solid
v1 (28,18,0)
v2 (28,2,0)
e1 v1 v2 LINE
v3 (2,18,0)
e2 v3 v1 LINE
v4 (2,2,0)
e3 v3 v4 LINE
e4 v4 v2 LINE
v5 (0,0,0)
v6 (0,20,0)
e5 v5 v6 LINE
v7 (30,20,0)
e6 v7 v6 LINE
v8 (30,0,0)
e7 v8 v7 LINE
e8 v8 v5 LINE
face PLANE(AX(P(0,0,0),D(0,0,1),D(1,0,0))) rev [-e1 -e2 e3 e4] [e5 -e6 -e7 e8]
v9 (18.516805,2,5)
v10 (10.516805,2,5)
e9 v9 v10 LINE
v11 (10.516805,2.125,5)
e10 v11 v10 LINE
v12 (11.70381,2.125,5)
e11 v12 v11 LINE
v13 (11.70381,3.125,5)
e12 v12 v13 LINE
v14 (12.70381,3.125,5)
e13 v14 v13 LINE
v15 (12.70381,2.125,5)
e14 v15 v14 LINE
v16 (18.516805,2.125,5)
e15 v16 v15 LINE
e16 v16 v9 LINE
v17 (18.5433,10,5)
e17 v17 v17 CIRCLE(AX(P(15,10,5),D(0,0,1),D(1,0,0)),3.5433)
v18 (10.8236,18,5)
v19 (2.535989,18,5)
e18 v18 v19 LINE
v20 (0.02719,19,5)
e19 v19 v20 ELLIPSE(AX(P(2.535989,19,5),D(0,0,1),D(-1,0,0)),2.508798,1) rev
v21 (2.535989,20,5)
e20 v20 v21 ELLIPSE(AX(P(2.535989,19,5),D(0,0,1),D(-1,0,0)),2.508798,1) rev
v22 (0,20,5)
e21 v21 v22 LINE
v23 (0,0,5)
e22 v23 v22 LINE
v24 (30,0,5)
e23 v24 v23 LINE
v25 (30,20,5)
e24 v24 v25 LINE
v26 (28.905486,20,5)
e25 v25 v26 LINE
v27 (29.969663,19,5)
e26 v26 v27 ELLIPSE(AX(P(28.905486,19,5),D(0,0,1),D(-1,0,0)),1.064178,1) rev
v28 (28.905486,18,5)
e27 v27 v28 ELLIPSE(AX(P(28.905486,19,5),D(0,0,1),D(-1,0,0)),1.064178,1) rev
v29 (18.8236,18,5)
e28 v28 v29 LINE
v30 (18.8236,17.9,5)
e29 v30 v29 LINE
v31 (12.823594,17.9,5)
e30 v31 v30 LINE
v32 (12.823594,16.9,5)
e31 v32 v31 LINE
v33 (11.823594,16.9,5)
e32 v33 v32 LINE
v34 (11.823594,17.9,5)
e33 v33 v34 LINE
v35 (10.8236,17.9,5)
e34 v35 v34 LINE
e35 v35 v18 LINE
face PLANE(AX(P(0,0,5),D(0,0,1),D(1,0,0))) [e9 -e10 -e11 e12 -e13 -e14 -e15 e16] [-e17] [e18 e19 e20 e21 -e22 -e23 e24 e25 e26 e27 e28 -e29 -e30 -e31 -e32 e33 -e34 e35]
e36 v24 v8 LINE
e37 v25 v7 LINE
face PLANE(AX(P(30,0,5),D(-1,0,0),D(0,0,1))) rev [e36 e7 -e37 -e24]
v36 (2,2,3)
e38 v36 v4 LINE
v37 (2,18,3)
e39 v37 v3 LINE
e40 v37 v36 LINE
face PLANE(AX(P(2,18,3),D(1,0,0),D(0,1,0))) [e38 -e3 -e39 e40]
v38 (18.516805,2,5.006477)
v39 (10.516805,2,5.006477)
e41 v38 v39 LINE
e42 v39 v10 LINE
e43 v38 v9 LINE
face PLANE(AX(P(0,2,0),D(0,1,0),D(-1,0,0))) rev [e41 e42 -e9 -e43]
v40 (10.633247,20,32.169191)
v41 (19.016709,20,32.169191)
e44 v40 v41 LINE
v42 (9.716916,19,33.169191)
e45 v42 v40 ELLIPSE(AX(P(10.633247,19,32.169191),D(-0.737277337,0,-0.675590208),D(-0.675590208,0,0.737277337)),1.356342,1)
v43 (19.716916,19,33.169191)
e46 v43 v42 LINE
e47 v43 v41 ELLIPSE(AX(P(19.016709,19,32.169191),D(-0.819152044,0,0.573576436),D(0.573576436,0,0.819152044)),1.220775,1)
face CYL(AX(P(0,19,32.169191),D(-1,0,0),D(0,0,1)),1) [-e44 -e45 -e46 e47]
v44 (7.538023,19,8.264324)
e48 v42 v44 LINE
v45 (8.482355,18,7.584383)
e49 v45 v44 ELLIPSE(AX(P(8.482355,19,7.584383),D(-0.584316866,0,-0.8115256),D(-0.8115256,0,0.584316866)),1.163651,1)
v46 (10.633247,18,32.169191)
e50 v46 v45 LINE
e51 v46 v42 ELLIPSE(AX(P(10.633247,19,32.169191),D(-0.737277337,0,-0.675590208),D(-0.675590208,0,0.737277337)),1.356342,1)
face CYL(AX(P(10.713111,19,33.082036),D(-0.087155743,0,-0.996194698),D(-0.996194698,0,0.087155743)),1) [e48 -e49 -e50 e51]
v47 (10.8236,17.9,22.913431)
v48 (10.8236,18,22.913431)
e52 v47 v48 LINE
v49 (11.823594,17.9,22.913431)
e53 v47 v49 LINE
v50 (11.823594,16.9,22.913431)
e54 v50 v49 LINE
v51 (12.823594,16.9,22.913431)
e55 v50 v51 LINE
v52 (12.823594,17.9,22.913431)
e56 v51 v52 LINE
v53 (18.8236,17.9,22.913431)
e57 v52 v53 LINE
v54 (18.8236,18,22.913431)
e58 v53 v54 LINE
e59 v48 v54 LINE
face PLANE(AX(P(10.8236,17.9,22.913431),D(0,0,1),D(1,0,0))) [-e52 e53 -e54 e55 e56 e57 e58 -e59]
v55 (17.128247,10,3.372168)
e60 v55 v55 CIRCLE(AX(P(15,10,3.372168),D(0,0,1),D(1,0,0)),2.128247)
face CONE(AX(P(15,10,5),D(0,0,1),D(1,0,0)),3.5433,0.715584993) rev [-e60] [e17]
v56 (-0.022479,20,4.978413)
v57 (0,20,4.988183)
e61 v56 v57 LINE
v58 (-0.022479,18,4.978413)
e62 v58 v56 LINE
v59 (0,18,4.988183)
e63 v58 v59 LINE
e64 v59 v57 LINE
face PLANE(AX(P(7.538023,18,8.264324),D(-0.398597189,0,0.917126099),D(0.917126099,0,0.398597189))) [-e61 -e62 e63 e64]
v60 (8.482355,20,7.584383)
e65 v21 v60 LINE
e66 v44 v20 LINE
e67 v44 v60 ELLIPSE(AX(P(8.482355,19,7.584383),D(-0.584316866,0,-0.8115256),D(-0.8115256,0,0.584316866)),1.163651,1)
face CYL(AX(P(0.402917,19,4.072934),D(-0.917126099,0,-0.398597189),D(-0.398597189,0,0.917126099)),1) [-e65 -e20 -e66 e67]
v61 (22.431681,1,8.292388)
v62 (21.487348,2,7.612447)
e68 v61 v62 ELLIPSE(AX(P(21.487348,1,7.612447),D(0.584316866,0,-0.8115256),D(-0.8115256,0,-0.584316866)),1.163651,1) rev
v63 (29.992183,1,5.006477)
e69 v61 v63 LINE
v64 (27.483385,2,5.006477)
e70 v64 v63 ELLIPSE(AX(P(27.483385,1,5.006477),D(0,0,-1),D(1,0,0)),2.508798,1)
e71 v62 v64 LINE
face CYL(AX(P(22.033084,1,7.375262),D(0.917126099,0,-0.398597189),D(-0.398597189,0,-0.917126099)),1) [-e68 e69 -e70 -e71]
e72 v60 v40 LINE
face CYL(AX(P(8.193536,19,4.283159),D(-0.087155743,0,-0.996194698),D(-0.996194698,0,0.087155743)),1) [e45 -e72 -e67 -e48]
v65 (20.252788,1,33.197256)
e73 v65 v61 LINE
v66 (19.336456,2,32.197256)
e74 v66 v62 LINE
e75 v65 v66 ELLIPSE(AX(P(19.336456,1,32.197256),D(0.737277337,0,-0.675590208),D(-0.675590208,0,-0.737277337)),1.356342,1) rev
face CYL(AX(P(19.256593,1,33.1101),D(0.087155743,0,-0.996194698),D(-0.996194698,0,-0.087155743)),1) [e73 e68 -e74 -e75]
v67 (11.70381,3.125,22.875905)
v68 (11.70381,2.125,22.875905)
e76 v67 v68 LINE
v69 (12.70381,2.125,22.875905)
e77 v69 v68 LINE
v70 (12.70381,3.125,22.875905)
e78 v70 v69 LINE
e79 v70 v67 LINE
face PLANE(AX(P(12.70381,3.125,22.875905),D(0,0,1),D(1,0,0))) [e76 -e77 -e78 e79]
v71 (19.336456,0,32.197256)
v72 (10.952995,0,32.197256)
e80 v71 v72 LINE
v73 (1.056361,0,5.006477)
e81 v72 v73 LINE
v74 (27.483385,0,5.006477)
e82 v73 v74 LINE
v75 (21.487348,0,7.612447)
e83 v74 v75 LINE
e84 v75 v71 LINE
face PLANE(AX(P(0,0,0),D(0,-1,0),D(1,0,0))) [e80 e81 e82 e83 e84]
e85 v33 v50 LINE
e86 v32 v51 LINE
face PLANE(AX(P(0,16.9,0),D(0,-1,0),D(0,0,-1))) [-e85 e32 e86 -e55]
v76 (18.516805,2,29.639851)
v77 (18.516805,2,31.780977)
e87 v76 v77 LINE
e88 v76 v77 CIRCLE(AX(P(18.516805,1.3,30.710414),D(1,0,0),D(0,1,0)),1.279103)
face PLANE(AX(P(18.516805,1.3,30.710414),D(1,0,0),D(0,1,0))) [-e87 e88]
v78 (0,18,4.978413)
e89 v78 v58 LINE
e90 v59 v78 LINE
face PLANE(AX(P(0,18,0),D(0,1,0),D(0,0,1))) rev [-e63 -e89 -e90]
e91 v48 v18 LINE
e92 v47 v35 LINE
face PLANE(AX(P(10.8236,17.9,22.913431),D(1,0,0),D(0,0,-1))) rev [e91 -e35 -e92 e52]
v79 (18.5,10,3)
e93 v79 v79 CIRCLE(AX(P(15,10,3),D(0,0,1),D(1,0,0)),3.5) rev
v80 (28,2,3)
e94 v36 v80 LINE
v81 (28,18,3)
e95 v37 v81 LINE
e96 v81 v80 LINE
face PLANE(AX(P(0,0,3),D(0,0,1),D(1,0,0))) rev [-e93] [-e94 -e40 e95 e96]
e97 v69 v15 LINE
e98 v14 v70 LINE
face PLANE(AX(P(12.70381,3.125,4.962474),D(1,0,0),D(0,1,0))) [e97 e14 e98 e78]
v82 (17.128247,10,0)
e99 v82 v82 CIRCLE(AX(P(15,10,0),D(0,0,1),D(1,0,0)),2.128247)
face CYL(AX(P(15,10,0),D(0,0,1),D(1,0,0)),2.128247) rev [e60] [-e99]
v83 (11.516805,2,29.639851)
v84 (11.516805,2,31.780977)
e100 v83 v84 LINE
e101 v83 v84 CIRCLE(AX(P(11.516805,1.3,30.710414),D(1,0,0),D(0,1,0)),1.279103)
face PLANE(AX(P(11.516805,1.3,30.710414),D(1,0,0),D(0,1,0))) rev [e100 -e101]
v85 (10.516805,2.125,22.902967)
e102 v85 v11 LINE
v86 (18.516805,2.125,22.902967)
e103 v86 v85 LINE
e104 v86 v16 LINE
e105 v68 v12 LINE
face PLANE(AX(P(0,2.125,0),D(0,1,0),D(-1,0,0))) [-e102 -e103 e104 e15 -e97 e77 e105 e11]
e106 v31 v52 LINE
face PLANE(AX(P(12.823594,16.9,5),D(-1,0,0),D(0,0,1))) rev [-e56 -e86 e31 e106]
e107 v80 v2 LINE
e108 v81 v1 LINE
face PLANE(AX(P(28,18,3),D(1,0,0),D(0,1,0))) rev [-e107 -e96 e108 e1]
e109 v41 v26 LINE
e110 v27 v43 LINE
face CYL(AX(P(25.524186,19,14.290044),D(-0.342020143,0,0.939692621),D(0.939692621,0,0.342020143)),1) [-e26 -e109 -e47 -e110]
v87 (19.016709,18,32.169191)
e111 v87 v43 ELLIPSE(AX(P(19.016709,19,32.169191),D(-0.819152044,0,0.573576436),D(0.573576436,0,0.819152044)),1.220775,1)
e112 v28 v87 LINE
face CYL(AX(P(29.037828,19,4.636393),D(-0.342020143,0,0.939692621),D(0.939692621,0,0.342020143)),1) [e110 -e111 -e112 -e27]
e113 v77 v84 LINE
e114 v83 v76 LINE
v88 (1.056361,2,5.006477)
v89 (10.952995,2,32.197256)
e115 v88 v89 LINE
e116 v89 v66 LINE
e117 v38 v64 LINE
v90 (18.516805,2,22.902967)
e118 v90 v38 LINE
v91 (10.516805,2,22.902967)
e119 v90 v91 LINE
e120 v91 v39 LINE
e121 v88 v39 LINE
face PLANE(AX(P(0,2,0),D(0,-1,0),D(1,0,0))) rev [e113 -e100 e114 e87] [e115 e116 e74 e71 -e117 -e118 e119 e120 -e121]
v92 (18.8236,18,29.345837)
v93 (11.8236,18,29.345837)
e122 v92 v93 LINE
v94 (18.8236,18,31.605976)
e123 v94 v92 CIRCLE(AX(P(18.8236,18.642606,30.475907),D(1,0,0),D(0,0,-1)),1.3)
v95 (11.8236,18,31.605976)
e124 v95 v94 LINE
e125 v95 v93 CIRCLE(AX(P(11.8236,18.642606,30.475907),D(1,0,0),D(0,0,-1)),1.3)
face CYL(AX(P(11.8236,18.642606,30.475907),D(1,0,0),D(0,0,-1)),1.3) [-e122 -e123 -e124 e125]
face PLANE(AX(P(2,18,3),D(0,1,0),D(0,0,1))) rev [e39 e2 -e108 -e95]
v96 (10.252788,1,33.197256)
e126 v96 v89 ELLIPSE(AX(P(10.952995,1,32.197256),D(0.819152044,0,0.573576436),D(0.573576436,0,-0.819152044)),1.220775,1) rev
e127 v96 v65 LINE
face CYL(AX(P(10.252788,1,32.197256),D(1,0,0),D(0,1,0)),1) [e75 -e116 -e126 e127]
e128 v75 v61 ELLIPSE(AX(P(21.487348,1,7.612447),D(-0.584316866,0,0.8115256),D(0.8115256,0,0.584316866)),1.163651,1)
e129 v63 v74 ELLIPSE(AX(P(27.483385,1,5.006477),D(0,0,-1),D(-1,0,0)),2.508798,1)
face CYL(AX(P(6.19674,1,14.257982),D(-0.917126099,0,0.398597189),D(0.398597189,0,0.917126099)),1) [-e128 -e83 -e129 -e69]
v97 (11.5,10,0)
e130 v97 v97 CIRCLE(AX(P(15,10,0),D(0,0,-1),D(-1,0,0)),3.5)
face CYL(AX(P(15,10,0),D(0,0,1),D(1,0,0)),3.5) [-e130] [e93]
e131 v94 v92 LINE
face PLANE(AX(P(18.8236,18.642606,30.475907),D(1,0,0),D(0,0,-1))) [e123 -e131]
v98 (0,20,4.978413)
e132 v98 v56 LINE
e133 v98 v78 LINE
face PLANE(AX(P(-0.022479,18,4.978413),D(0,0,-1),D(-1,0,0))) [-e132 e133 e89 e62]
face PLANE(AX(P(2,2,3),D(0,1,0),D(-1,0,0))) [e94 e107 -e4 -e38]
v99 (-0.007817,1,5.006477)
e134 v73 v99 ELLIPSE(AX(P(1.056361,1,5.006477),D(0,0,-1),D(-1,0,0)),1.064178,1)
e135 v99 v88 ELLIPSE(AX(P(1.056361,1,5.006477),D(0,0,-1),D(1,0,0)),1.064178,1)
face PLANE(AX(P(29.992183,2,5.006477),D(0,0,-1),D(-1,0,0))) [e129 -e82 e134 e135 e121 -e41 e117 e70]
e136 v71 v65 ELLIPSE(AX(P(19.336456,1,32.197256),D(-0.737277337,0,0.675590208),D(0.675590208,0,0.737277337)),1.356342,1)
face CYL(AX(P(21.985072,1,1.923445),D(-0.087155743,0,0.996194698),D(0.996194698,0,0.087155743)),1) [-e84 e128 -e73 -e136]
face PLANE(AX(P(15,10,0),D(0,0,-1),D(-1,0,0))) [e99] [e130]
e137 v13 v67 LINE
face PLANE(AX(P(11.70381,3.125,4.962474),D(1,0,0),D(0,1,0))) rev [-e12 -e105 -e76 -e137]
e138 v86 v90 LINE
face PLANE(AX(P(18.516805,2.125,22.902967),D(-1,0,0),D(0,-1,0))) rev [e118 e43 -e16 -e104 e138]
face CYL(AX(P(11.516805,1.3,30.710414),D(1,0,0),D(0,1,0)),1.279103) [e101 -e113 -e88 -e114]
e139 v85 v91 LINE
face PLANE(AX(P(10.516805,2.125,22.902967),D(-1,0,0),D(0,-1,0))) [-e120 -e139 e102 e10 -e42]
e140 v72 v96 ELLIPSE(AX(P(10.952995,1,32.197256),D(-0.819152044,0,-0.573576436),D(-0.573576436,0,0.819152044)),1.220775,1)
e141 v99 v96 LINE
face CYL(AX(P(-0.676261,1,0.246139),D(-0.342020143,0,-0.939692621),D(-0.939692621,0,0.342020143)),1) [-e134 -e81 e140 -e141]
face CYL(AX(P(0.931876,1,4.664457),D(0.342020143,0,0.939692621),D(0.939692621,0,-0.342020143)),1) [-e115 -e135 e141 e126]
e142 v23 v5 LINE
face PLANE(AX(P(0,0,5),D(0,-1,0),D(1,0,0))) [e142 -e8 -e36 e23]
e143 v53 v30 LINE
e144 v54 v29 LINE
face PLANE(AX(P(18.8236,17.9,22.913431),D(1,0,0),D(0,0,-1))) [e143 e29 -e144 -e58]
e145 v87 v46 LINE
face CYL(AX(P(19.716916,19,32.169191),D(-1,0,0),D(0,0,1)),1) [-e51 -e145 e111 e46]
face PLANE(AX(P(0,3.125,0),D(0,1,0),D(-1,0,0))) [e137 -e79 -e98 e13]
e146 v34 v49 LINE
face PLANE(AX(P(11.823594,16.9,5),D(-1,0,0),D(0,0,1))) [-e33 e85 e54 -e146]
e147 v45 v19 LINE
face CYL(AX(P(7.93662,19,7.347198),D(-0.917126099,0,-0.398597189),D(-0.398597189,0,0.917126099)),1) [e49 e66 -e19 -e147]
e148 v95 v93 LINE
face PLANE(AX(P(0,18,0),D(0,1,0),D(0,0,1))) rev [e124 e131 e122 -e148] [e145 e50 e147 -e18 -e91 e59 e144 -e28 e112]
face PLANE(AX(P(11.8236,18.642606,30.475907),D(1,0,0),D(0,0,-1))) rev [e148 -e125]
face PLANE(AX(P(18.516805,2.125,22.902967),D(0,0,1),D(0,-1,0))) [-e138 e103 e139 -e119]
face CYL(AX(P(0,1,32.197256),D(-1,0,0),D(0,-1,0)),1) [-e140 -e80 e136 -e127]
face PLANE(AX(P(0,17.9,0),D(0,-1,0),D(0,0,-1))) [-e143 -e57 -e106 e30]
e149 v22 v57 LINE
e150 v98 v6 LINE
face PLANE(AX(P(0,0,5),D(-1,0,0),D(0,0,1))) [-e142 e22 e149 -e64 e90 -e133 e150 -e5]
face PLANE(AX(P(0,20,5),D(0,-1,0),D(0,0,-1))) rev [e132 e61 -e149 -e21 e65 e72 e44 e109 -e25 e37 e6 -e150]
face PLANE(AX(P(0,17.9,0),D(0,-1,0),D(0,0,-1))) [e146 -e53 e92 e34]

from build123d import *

# Parameters (mm, degrees)
ESQUISSE1_W                                       = 10
ESQUISSE1_H                                       = 20
ESQUISSE1_W_2                                     = 20
BOSS_EXTRU_3_DEPTH                                = 5
BOSS_EXTRU_5_DEPTH                                = 2
ESQUISSE15_W                                      = 8
ESQUISSE15_H                                      = 17.913431031
BOSS_EXTRU_6_DEPTH                                = 0.1
ESQUISSE16_W                                      = 1
ESQUISSE16_H                                      = 17.913431031
BOSS_EXTRU_7_DEPTH                                = 1
BOSS_EXTRU_11_DEPTH                               = 2
ESQUISSE32_W                                      = 8
ESQUISSE32_H                                      = 17.913431031
BOSS_EXTRU_14_DEPTH                               = 0.125
ESQUISSE42_R                                      = 1.279103286
BOSS_EXTRU_18_DEPTH                               = 7
ESQUISSE56_R                                      = 1.3
BOSS_EXTRU_20_DEPTH                               = 7
CONG_4_R                                          = 1
ESQUISSE33_W                                      = 1
ESQUISSE33_H                                      = 17.913431031
BOSS_EXTRU_15_DEPTH                               = 1
ESQUISSE35_R                                      = 2.128247198
ENL_V_MAT_EXTRU_1_DEPTH                           = 5
ESQUISSE37_W                                      = 26
ESQUISSE37_H                                      = 16
ENL_V_MAT_EXTRU_2_DEPTH                           = 3
ESQUISSE38_R                                      = 3.5
BOSS_EXTRU_17_DEPTH                               = 3
ESQUISSE35_3_R                                    = 2.128247198
ENL_V_MAT_EXTRU_3_DEPTH                           = 5
FRAISAGE_POUR_VIS_T_TE_FRAIS_E_BOMB_E_D           = 3.7973
FRAISAGE_POUR_VIS_T_TE_FRAIS_E_BOMB_E_CSINK_D     = 7.0866
FRAISAGE_POUR_VIS_T_TE_FRAIS_E_BOMB_E_CSINK_ANGLE = 82


with BuildPart() as part:
    # Esquisse1 → Boss.-Extru.3 (new body)
    with BuildSketch(Plane.XY):
        with Locations((25, 10)):
            Rectangle(ESQUISSE1_W, ESQUISSE1_H)
        with Locations((10, 10)):
            Rectangle(ESQUISSE1_W_2, ESQUISSE1_H)
    extrude(amount=BOSS_EXTRU_3_DEPTH)

    # Esquisse14 → Boss.-Extru.5 (add)
    with BuildSketch(Plane(origin=(0, 20, 0), x_dir=(1, 0, 0), z_dir=(0, 1, 0))):
        Polygon((29.977520524, -4.978412673), (19.716916224, -33.169191296), (9.716916224, -33.169191296), (7.538022655, -8.264323844), (-0.022479476, -4.978412673), align=None)
    extrude(amount=-BOSS_EXTRU_5_DEPTH)

    # Esquisse15 → Boss.-Extru.6 (add)
    with BuildSketch(Plane(origin=(0, 18, 0), x_dir=(-1, 0, 0), z_dir=(0, -1, 0))):
        with Locations((-14.823599663, -13.956715516)):
            Rectangle(ESQUISSE15_W, ESQUISSE15_H)
    extrude(amount=BOSS_EXTRU_6_DEPTH)

    # Esquisse16 → Boss.-Extru.7 (add)
    with BuildSketch(Plane.XZ.offset(-17.9)):
        with Locations((12.323594191, 13.956715516)):
            Rectangle(ESQUISSE16_W, ESQUISSE16_H)
    extrude(amount=BOSS_EXTRU_7_DEPTH)



with BuildPart() as body_2:
    # Esquisse20 → Boss.-Extru.11 (new body)
    with BuildSketch(Plane(origin=(0, 0, 0), x_dir=(-1, 0, 0), z_dir=(0, -1, 0))):
        Polygon((0.007816785, -5.006477186), (-10.252787515, -33.19725581), (-20.252787515, -33.19725581), (-22.431681083, -8.292388358), (-29.992183215, -5.006477186), align=None)
    extrude(amount=-BOSS_EXTRU_11_DEPTH)


with BuildPart() as part_1:
    add(part.part)

    add(body_2.part)  # Boss.-Extru.14 merges body 2
    # Esquisse32 → Boss.-Extru.14 (add)
    with BuildSketch(Plane(origin=(0, 2, 0), x_dir=(1, 0, 0), z_dir=(0, 1, 0))):
        with Locations((14.516805055, -13.946251691)):
            Rectangle(ESQUISSE32_W, ESQUISSE32_H)
    extrude(amount=BOSS_EXTRU_14_DEPTH)

    # Esquisse42 → Boss.-Extru.18 (add)
    with BuildSketch(Plane(origin=(18.516805055, 0, 0), x_dir=(0, 0, -1), z_dir=(1, 0, 0))):
        with Locations((-30.710413968, 1.3)):
            Circle(ESQUISSE42_R)
    extrude(amount=-BOSS_EXTRU_18_DEPTH)

    # Esquisse56 → Boss.-Extru.20 (add)
    with BuildSketch(Plane(origin=(18.823599663, 0, 0), x_dir=(0, 0, -1), z_dir=(1, 0, 0))):
        with Locations((-30.475906609, 18.642606084)):
            Circle(ESQUISSE56_R)
    extrude(amount=-BOSS_EXTRU_20_DEPTH)

    # Congé4
    cong_4_edges = [part_1.edges().sort_by_distance(p)[0] for p in [
        (5.122485365, 2, 19.101866498),
        (5.122485365, 0, 19.101866498),
        (15.252787515, 0, 33.19725581),
        (15.252787515, 2, 33.19725581),
        (21.342234299, 2, 20.744822084),
        (21.342234299, 0, 20.744822084),
        (26.211932149, 2, 6.649432772),
        (26.211932149, 0, 6.649432772),
        (3.782606563, 18, 6.632161922),
        (3.782606563, 20, 6.632161922),
        (8.62746944, 18, 20.71675757),
        (8.62746944, 20, 20.71675757),
        (14.716916224, 18, 33.169191296),
        (14.716916224, 20, 33.169191296),
        (24.843289802, 18, 19.084595648),
        (24.843289802, 20, 19.084595648),
    ]]
    fillet(cong_4_edges, radius=CONG_4_R - 0.0001)  # a hair under: the kernel refuses the full size

    # Esquisse33 → Boss.-Extru.15 (add)
    with BuildSketch(Plane(origin=(0, 2.125, 0), x_dir=(-1, 0, 0), z_dir=(0, 1, 0))):
        with Locations((-12.203810405, 13.919189864)):
            Rectangle(ESQUISSE33_W, ESQUISSE33_H)
    extrude(amount=BOSS_EXTRU_15_DEPTH)

    # Esquisse35 → Enlèv. mat.-Extru.1 (cut)
    with BuildSketch(Plane.XY.offset(5)):
        with Locations((15, 10)):
            Circle(ESQUISSE35_R)
    extrude(amount=-ENL_V_MAT_EXTRU_1_DEPTH, mode=Mode.SUBTRACT)

    # Esquisse37 → Enlèv. mat.-Extru.2 (cut)
    with BuildSketch(Plane(origin=(0, 0, 0), x_dir=(-1, 0, 0), z_dir=(0, 0, -1))):
        with Locations((-15, 10)):
            Rectangle(ESQUISSE37_W, ESQUISSE37_H)
    extrude(amount=-ENL_V_MAT_EXTRU_2_DEPTH, mode=Mode.SUBTRACT)

    # Esquisse38 → Boss.-Extru.17 (add)
    with BuildSketch(Plane(origin=(0, 0, 3), x_dir=(-1, 0, 0), z_dir=(0, 0, -1))):
        with Locations(Location((-15, 10, 0), (0, 0, 180))):
            Circle(ESQUISSE38_R)
    extrude(amount=BOSS_EXTRU_17_DEPTH)

    # Esquisse35<3> → Enlèv. mat.-Extru.3 (cut)
    with BuildSketch(Plane.XY.offset(5)):
        with Locations((15, 10)):
            Circle(ESQUISSE35_3_R)
    extrude(amount=-ENL_V_MAT_EXTRU_3_DEPTH, mode=Mode.SUBTRACT)

    # Fraisage pour vis à tête fraisée bombée #61 (through all)
    with Locations(Plane.XY.offset(5)):
        with Locations((15, 10)):
            CounterSinkHole(FRAISAGE_POUR_VIS_T_TE_FRAIS_E_BOMB_E_D / 2, FRAISAGE_POUR_VIS_T_TE_FRAIS_E_BOMB_E_CSINK_D / 2, counter_sink_angle=FRAISAGE_POUR_VIS_T_TE_FRAIS_E_BOMB_E_CSINK_ANGLE)


solid = part_1.part
